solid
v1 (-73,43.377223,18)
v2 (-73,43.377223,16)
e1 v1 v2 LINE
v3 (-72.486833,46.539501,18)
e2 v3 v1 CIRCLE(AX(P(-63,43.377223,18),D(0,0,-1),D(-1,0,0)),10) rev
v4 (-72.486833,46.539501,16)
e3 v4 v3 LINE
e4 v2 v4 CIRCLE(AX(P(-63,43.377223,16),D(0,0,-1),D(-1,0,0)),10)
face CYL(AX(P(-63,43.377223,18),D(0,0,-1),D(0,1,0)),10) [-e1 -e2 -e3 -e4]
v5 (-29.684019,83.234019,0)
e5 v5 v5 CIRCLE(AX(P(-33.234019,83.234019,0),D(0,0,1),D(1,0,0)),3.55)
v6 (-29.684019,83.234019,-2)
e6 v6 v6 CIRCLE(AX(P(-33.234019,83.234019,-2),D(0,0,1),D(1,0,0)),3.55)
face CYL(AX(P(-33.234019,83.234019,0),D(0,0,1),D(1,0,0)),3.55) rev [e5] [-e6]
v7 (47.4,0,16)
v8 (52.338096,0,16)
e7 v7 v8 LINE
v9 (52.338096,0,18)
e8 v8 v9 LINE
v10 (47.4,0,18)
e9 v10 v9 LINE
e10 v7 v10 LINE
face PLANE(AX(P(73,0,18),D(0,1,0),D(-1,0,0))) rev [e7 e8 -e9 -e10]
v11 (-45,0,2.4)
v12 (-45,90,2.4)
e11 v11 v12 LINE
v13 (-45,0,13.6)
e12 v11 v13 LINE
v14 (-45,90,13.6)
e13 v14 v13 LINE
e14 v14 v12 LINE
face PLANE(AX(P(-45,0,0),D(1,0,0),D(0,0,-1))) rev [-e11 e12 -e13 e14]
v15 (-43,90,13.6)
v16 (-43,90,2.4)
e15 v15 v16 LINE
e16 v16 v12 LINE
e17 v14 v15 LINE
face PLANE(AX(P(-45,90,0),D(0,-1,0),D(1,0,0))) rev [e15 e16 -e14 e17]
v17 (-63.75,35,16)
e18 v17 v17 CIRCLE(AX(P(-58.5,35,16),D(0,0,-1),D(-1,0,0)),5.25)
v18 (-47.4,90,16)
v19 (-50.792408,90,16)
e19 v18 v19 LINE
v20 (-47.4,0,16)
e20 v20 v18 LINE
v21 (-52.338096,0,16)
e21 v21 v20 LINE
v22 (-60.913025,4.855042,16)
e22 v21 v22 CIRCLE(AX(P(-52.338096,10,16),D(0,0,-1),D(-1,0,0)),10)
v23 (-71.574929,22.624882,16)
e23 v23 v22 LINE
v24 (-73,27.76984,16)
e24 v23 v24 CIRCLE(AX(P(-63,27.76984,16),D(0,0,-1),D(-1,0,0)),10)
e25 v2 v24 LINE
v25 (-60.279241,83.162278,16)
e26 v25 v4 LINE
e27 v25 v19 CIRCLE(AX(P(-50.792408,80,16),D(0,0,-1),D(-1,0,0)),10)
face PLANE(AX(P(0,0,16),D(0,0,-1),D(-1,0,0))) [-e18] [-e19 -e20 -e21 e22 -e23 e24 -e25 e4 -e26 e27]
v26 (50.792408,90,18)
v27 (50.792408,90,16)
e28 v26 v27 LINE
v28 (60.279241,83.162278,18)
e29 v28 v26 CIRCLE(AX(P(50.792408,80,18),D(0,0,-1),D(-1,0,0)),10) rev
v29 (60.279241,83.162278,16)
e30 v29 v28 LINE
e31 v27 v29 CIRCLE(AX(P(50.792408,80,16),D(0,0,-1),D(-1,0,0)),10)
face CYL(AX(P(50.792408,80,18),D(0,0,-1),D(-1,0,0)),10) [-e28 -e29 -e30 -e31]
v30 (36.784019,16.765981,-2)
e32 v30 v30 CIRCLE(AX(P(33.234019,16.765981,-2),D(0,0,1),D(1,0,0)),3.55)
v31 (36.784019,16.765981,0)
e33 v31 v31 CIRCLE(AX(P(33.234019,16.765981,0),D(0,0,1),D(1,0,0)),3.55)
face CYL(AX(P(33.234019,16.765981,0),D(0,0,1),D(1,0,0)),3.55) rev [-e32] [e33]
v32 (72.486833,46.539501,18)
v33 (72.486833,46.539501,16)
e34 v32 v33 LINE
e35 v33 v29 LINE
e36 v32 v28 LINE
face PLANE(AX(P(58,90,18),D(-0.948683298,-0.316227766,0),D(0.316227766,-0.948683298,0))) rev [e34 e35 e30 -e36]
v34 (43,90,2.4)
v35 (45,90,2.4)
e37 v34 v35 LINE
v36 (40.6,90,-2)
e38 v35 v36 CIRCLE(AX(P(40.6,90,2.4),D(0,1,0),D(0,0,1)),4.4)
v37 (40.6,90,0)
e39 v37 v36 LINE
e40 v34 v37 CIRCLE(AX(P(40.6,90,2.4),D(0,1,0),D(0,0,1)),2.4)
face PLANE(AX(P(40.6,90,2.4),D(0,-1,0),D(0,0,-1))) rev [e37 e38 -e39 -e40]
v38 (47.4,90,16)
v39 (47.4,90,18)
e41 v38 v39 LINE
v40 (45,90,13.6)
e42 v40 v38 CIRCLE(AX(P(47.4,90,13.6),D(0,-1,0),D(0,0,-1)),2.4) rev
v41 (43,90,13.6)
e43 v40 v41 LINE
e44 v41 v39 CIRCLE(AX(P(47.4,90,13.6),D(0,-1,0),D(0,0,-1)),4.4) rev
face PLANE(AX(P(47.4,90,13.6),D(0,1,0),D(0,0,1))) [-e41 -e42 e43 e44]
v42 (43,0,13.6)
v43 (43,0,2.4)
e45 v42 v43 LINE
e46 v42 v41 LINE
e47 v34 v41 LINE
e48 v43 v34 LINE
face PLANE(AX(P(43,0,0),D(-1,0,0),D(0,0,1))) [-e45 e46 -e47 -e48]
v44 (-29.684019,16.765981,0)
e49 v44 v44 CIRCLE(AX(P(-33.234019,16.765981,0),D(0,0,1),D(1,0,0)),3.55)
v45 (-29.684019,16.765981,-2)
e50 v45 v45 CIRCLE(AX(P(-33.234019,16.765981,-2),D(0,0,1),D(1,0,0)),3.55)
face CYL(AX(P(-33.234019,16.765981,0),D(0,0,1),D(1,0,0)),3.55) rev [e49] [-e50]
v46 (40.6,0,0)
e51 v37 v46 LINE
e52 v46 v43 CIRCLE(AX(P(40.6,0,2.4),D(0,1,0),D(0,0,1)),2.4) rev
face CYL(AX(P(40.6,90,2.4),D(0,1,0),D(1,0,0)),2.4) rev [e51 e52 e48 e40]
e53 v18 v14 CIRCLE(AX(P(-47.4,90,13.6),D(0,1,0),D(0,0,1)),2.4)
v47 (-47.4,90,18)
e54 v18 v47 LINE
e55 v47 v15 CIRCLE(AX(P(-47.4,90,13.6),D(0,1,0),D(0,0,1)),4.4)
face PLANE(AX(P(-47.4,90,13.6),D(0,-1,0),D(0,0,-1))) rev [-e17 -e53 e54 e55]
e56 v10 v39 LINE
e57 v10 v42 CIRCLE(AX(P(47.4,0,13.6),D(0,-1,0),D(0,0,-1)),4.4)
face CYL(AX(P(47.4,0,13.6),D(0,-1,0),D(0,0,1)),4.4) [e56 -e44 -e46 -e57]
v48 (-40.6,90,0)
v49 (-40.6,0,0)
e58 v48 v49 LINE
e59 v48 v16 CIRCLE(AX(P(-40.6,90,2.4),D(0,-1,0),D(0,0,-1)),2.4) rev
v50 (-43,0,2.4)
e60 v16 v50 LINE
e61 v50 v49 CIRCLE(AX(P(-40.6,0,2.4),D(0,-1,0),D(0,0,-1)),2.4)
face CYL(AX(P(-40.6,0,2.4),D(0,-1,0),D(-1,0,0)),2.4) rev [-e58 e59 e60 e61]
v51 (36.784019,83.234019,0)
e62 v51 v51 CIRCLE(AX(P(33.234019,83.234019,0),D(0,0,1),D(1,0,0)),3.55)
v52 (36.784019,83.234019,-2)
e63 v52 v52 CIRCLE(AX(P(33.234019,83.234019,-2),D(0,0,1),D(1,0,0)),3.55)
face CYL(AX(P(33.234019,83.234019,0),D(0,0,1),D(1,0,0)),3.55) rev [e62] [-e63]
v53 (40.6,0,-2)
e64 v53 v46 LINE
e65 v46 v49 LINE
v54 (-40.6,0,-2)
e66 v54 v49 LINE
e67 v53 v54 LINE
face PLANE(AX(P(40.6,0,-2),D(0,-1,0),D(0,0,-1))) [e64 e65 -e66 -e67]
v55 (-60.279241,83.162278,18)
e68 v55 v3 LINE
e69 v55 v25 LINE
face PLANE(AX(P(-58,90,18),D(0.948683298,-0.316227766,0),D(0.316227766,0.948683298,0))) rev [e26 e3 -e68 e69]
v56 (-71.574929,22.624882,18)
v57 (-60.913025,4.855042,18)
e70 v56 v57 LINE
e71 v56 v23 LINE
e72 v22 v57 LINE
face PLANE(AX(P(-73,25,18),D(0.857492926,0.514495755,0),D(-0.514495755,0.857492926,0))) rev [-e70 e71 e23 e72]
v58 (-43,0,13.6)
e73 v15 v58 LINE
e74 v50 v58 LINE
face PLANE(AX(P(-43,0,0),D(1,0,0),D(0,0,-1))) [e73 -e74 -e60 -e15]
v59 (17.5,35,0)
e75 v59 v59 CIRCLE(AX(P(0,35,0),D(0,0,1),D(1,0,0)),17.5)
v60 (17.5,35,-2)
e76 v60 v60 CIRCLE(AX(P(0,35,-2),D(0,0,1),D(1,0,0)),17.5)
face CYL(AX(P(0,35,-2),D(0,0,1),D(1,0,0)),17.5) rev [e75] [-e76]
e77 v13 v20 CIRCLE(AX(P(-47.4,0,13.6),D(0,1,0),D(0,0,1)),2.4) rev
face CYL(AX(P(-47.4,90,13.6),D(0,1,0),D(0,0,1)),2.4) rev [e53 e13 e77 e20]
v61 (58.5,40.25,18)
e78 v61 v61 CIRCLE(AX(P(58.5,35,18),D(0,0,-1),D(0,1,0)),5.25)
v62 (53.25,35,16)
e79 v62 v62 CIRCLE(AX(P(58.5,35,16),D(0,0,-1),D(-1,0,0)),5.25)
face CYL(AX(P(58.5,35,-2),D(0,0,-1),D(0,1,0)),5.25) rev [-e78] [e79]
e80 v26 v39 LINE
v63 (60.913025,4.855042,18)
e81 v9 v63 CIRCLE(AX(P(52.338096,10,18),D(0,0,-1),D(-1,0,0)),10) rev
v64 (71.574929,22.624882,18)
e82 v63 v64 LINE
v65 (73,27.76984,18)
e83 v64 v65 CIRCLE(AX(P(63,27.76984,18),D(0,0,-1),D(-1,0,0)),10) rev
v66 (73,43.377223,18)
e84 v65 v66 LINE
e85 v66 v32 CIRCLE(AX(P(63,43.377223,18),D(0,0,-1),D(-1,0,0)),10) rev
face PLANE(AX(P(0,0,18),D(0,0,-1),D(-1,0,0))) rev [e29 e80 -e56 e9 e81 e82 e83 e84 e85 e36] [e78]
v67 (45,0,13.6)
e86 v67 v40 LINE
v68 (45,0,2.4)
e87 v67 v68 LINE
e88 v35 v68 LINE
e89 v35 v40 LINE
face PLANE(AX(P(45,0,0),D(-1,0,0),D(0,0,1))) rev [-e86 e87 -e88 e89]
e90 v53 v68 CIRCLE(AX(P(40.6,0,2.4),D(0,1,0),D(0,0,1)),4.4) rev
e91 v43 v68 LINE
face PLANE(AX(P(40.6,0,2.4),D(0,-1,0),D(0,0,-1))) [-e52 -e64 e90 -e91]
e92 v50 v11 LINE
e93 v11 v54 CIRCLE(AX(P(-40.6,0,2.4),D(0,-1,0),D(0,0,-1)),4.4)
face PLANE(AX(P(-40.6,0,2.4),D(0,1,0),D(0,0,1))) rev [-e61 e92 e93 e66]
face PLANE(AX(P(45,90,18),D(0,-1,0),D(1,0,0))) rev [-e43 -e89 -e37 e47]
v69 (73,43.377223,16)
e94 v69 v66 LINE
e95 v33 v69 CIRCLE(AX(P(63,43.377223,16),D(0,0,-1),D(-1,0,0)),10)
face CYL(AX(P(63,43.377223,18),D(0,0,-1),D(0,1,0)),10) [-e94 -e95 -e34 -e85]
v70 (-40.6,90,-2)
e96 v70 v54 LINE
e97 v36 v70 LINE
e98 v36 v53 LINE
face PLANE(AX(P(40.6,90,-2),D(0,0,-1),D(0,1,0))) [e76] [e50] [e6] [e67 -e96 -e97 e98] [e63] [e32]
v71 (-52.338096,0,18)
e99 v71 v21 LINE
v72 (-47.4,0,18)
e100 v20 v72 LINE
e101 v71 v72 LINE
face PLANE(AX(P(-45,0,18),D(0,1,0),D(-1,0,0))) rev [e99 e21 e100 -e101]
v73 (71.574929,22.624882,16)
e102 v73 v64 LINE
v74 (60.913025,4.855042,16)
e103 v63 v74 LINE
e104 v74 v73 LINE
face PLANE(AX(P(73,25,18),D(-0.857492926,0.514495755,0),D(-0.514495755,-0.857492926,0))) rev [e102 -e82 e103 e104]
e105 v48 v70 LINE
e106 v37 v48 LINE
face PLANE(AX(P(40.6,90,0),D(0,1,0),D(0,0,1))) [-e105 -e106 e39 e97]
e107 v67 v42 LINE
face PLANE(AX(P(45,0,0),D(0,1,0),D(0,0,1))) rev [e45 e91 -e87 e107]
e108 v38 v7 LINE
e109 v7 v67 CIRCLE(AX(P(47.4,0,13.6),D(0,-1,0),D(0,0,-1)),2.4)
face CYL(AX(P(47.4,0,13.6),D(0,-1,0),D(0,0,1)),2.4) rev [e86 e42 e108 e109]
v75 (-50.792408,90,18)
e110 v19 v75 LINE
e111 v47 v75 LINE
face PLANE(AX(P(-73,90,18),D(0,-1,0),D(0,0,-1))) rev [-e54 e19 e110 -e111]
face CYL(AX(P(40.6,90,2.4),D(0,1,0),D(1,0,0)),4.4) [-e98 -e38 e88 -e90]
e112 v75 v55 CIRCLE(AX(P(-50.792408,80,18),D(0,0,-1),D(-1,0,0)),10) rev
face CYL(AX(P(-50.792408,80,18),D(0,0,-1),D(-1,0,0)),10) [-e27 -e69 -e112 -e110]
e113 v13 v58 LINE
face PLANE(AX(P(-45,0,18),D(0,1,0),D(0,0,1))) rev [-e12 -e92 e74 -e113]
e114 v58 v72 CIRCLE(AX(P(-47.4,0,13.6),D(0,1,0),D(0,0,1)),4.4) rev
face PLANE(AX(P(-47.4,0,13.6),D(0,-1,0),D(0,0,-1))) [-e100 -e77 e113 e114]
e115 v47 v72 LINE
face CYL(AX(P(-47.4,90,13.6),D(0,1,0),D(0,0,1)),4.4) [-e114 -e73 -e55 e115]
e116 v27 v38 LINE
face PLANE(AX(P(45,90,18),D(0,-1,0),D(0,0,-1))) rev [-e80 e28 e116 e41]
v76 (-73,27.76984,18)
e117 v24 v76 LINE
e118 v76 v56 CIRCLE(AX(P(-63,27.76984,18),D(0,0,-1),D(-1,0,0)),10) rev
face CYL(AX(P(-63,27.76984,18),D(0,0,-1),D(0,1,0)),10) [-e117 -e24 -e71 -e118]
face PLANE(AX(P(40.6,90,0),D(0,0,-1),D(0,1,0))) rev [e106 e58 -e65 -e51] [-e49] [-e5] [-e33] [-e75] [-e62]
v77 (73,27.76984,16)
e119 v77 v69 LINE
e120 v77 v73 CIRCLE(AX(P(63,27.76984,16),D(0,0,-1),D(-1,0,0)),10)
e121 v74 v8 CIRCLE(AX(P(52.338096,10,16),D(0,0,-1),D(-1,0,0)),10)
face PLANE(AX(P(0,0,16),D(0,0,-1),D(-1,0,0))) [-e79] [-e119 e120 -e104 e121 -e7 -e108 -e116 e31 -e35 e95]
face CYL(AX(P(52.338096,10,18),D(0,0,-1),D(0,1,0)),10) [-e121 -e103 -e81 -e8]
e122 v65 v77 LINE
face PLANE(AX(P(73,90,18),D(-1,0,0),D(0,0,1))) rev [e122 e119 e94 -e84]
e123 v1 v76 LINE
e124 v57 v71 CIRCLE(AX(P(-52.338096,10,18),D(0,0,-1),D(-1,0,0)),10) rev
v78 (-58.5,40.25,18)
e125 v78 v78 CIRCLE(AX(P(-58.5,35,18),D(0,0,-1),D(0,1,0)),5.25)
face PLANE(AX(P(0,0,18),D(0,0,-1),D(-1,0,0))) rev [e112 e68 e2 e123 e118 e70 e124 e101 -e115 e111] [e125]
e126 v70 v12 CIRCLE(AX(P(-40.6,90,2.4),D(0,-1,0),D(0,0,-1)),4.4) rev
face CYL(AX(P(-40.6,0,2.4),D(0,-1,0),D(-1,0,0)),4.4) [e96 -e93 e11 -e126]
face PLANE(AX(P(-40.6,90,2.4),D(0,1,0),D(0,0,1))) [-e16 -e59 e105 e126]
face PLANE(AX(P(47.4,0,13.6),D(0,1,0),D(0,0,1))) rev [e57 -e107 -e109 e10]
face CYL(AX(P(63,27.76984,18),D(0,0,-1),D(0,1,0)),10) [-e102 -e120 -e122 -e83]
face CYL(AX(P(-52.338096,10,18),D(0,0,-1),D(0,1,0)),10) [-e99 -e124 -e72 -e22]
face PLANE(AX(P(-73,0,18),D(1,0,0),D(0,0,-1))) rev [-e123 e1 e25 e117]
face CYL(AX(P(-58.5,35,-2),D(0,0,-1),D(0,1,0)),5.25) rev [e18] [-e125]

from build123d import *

# Parameters (mm, degrees)
SM_START                           = -40.6
SM_BASE_FLANGE_1_OUTLINE_W         = 2
SM_BASE_FLANGE_1_OUTLINE_H         = 90
SM_BASE_FLANGE_1_DEPTH             = 81.2
SKETCH_6_R                         = 17.5
CUT_EXTRUDE_1_DEPTH                = 10
F_7_1_7_1_DIAMETER_HOLE1_D         = 7.1
SM_EDGE_FLANGE_1_DEPTH             = 90
SM_EDGE_FLANGE_1_BEND_DEPTH        = 90
SM_EDGE_FLANGE_2_STRIP_W           = 12.8
SM_EDGE_FLANGE_2_STRIP_H           = 2
SM_EDGE_FLANGE_2_STRIP_CUT_DEPTH   = 90
SM_EDGE_FLANGE_2_STRIP_2_W         = 12.8
SM_EDGE_FLANGE_2_STRIP_2_H         = 2
SM_EDGE_FLANGE_2_STRIP_CUT_2_DEPTH = 90
SM_EDGE_FLANGE_2_DEPTH             = 90
SM_EDGE_FLANGE_2_BEND_DEPTH        = 90
CUT_EXTRUDE1_DEPTH                 = 118.273185341
FILLET_2_R                         = 10
F_10_5_10_5_DIAMETER_HOLE1_D       = 10.5


# Read off the part's stored shape, not the designer's step: Базовая кромка1
# Sheet-metal steps are written as plain solids
with BuildPart() as part:
    # Базовая кромка1 outline → Базовая кромка1 (new body)
    with BuildSketch(Plane(origin=(0, 0, 0), x_dir=(0, 0, -1), z_dir=(1, 0, 0)).offset(SM_START)):
        with Locations((1, 45)):
            Rectangle(SM_BASE_FLANGE_1_OUTLINE_W, SM_BASE_FLANGE_1_OUTLINE_H)
    extrude(amount=SM_BASE_FLANGE_1_DEPTH)

    # Эскиз6 → Вырез-Вытянуть1 (cut)
    with BuildSketch(Plane.XY):
        with Locations((0, 35)):
            Circle(SKETCH_6_R)
    extrude(amount=-CUT_EXTRUDE_1_DEPTH, mode=Mode.SUBTRACT)

    # Ø7.1 (7.1) Diameter Hole1 (through all)
    with Locations(Plane.XY):
        with Locations((-33.234018716, 83.234018716), (33.234018716, 83.234018716), (33.234018716, 16.765981284), (-33.234018716, 16.765981284)):
            Hole(F_7_1_7_1_DIAMETER_HOLE1_D / 2)

    # Ребро-кромка1 section (across the edge) → Ребро-кромка1 (add)
    with BuildSketch(Plane(origin=(43, 0, 0), x_dir=(-1, 0, 0), z_dir=(0, 1, 0))):
        with BuildLine():
            Line((-2, 2.4), (-2, 18))
            Line((-2, 18), (0, 18))
            Line((0, 18), (0, 2.4))
            ThreePointArc((0, 2.4), (0.702943725, 0.702943725), (2.4, 0))
            Line((2.4, 0), (2.4, -2))
            ThreePointArc((2.4, -2), (-0.711269837, -0.711269837), (-2, 2.4))
        make_face()
    extrude(amount=SM_EDGE_FLANGE_1_DEPTH)

    # Ребро-кромка1 section 2 (across the edge) → Ребро-кромка1 bend (add)
    with BuildSketch(Plane(origin=(-43, 90, 0), x_dir=(1, 0, 0), z_dir=(0, -1, 0))):
        with BuildLine():
            Line((-2, 2.4), (-2, 18))
            Line((-2, 18), (0, 18))
            Line((0, 18), (0, 2.4))
            ThreePointArc((0, 2.4), (0.702943725, 0.702943725), (2.4, 0))
            Line((2.4, 0), (2.4, -2))
            ThreePointArc((2.4, -2), (-0.711269837, -0.711269837), (-2, 2.4))
        make_face()
    extrude(amount=SM_EDGE_FLANGE_1_BEND_DEPTH)

    # Ребро-кромка2 strip (across the edge) → Ребро-кромка2 strip cut (cut)
    with BuildSketch(Plane(origin=(45, 90, 18), x_dir=(0, 0, -1), z_dir=(0, -1, 0))):
        with Locations((-2, -1)):
            Rectangle(SM_EDGE_FLANGE_2_STRIP_W, SM_EDGE_FLANGE_2_STRIP_H)
    extrude(amount=SM_EDGE_FLANGE_2_STRIP_CUT_DEPTH, mode=Mode.SUBTRACT)

    # Ребро-кромка2 strip 2 (across the edge) → Ребро-кромка2 strip cut 2 (cut)
    with BuildSketch(Plane(origin=(-45, 0, 18), x_dir=(0, 0, -1), z_dir=(0, 1, 0))):
        with Locations((-2, -1)):
            Rectangle(SM_EDGE_FLANGE_2_STRIP_2_W, SM_EDGE_FLANGE_2_STRIP_2_H)
    extrude(amount=SM_EDGE_FLANGE_2_STRIP_CUT_2_DEPTH, mode=Mode.SUBTRACT)

    # Ребро-кромка2 section (across the edge) → Ребро-кромка2 (add)
    with BuildSketch(Plane(origin=(45, 90, 18), x_dir=(0, 0, -1), z_dir=(0, -1, 0))):
        with BuildLine():
            Line((0, 2.4), (0, 28))
            Line((0, 28), (2, 28))
            Line((2, 28), (2, 2.4))
            ThreePointArc((2, 2.4), (2.702943725, 0.702943725), (4.4, 0))
            Line((4.4, 0), (4.4, -2))
            ThreePointArc((4.4, -2), (1.288730163, -0.711269837), (0, 2.4))
        make_face()
    extrude(amount=SM_EDGE_FLANGE_2_DEPTH)

    # Ребро-кромка2 section 2 (across the edge) → Ребро-кромка2 bend (add)
    with BuildSketch(Plane(origin=(-45, 0, 18), x_dir=(0, 0, -1), z_dir=(0, 1, 0))):
        with BuildLine():
            Line((0, 2.4), (0, 28))
            Line((0, 28), (2, 28))
            Line((2, 28), (2, 2.4))
            ThreePointArc((2, 2.4), (2.702943725, 0.702943725), (4.4, 0))
            Line((4.4, 0), (4.4, -2))
            ThreePointArc((4.4, -2), (1.288730163, -0.711269837), (0, 2.4))
        make_face()
    extrude(amount=SM_EDGE_FLANGE_2_BEND_DEPTH)

    # Sketch4 → Cut-Extrude1 (cut, through all)
    with BuildSketch(Plane(origin=(0, 0, 16), x_dir=(-1, 0, 0), z_dir=(0, 0, -1))):
        Polygon((-73, 90), (-58, 90), (-73, 45), align=None)
        Polygon((-73, 25), (-58, 0), (-73, 0), align=None)
        Polygon((73, 0), (73, 25), (58, 0), align=None)
        Polygon((58, 90), (73, 45), (73, 90), align=None)
    extrude(amount=-CUT_EXTRUDE1_DEPTH, mode=Mode.SUBTRACT)

    # Скругление2
    fillet_2_edges = [part.edges().sort_by_distance(p)[0] for p in [
        (-58, 90, 17),
        (-73, 45, 17),
        (-58, 0, 17),
        (-73, 25, 17),
        (73, 25, 17),
        (58, 0, 17),
        (73, 45, 17),
        (58, 90, 17),
    ]]
    fillet(fillet_2_edges, radius=FILLET_2_R)

    # Ø10.5 (10.5) Diameter Hole1 (through all)
    with Locations(Plane(origin=(0, 0, -2), x_dir=(-1, 0, 0), z_dir=(0, 0, -1))):
        with Locations((-58.5, 35), (58.5, 35)):
            Hole(F_10_5_10_5_DIAMETER_HOLE1_D / 2)


solid = part.part
